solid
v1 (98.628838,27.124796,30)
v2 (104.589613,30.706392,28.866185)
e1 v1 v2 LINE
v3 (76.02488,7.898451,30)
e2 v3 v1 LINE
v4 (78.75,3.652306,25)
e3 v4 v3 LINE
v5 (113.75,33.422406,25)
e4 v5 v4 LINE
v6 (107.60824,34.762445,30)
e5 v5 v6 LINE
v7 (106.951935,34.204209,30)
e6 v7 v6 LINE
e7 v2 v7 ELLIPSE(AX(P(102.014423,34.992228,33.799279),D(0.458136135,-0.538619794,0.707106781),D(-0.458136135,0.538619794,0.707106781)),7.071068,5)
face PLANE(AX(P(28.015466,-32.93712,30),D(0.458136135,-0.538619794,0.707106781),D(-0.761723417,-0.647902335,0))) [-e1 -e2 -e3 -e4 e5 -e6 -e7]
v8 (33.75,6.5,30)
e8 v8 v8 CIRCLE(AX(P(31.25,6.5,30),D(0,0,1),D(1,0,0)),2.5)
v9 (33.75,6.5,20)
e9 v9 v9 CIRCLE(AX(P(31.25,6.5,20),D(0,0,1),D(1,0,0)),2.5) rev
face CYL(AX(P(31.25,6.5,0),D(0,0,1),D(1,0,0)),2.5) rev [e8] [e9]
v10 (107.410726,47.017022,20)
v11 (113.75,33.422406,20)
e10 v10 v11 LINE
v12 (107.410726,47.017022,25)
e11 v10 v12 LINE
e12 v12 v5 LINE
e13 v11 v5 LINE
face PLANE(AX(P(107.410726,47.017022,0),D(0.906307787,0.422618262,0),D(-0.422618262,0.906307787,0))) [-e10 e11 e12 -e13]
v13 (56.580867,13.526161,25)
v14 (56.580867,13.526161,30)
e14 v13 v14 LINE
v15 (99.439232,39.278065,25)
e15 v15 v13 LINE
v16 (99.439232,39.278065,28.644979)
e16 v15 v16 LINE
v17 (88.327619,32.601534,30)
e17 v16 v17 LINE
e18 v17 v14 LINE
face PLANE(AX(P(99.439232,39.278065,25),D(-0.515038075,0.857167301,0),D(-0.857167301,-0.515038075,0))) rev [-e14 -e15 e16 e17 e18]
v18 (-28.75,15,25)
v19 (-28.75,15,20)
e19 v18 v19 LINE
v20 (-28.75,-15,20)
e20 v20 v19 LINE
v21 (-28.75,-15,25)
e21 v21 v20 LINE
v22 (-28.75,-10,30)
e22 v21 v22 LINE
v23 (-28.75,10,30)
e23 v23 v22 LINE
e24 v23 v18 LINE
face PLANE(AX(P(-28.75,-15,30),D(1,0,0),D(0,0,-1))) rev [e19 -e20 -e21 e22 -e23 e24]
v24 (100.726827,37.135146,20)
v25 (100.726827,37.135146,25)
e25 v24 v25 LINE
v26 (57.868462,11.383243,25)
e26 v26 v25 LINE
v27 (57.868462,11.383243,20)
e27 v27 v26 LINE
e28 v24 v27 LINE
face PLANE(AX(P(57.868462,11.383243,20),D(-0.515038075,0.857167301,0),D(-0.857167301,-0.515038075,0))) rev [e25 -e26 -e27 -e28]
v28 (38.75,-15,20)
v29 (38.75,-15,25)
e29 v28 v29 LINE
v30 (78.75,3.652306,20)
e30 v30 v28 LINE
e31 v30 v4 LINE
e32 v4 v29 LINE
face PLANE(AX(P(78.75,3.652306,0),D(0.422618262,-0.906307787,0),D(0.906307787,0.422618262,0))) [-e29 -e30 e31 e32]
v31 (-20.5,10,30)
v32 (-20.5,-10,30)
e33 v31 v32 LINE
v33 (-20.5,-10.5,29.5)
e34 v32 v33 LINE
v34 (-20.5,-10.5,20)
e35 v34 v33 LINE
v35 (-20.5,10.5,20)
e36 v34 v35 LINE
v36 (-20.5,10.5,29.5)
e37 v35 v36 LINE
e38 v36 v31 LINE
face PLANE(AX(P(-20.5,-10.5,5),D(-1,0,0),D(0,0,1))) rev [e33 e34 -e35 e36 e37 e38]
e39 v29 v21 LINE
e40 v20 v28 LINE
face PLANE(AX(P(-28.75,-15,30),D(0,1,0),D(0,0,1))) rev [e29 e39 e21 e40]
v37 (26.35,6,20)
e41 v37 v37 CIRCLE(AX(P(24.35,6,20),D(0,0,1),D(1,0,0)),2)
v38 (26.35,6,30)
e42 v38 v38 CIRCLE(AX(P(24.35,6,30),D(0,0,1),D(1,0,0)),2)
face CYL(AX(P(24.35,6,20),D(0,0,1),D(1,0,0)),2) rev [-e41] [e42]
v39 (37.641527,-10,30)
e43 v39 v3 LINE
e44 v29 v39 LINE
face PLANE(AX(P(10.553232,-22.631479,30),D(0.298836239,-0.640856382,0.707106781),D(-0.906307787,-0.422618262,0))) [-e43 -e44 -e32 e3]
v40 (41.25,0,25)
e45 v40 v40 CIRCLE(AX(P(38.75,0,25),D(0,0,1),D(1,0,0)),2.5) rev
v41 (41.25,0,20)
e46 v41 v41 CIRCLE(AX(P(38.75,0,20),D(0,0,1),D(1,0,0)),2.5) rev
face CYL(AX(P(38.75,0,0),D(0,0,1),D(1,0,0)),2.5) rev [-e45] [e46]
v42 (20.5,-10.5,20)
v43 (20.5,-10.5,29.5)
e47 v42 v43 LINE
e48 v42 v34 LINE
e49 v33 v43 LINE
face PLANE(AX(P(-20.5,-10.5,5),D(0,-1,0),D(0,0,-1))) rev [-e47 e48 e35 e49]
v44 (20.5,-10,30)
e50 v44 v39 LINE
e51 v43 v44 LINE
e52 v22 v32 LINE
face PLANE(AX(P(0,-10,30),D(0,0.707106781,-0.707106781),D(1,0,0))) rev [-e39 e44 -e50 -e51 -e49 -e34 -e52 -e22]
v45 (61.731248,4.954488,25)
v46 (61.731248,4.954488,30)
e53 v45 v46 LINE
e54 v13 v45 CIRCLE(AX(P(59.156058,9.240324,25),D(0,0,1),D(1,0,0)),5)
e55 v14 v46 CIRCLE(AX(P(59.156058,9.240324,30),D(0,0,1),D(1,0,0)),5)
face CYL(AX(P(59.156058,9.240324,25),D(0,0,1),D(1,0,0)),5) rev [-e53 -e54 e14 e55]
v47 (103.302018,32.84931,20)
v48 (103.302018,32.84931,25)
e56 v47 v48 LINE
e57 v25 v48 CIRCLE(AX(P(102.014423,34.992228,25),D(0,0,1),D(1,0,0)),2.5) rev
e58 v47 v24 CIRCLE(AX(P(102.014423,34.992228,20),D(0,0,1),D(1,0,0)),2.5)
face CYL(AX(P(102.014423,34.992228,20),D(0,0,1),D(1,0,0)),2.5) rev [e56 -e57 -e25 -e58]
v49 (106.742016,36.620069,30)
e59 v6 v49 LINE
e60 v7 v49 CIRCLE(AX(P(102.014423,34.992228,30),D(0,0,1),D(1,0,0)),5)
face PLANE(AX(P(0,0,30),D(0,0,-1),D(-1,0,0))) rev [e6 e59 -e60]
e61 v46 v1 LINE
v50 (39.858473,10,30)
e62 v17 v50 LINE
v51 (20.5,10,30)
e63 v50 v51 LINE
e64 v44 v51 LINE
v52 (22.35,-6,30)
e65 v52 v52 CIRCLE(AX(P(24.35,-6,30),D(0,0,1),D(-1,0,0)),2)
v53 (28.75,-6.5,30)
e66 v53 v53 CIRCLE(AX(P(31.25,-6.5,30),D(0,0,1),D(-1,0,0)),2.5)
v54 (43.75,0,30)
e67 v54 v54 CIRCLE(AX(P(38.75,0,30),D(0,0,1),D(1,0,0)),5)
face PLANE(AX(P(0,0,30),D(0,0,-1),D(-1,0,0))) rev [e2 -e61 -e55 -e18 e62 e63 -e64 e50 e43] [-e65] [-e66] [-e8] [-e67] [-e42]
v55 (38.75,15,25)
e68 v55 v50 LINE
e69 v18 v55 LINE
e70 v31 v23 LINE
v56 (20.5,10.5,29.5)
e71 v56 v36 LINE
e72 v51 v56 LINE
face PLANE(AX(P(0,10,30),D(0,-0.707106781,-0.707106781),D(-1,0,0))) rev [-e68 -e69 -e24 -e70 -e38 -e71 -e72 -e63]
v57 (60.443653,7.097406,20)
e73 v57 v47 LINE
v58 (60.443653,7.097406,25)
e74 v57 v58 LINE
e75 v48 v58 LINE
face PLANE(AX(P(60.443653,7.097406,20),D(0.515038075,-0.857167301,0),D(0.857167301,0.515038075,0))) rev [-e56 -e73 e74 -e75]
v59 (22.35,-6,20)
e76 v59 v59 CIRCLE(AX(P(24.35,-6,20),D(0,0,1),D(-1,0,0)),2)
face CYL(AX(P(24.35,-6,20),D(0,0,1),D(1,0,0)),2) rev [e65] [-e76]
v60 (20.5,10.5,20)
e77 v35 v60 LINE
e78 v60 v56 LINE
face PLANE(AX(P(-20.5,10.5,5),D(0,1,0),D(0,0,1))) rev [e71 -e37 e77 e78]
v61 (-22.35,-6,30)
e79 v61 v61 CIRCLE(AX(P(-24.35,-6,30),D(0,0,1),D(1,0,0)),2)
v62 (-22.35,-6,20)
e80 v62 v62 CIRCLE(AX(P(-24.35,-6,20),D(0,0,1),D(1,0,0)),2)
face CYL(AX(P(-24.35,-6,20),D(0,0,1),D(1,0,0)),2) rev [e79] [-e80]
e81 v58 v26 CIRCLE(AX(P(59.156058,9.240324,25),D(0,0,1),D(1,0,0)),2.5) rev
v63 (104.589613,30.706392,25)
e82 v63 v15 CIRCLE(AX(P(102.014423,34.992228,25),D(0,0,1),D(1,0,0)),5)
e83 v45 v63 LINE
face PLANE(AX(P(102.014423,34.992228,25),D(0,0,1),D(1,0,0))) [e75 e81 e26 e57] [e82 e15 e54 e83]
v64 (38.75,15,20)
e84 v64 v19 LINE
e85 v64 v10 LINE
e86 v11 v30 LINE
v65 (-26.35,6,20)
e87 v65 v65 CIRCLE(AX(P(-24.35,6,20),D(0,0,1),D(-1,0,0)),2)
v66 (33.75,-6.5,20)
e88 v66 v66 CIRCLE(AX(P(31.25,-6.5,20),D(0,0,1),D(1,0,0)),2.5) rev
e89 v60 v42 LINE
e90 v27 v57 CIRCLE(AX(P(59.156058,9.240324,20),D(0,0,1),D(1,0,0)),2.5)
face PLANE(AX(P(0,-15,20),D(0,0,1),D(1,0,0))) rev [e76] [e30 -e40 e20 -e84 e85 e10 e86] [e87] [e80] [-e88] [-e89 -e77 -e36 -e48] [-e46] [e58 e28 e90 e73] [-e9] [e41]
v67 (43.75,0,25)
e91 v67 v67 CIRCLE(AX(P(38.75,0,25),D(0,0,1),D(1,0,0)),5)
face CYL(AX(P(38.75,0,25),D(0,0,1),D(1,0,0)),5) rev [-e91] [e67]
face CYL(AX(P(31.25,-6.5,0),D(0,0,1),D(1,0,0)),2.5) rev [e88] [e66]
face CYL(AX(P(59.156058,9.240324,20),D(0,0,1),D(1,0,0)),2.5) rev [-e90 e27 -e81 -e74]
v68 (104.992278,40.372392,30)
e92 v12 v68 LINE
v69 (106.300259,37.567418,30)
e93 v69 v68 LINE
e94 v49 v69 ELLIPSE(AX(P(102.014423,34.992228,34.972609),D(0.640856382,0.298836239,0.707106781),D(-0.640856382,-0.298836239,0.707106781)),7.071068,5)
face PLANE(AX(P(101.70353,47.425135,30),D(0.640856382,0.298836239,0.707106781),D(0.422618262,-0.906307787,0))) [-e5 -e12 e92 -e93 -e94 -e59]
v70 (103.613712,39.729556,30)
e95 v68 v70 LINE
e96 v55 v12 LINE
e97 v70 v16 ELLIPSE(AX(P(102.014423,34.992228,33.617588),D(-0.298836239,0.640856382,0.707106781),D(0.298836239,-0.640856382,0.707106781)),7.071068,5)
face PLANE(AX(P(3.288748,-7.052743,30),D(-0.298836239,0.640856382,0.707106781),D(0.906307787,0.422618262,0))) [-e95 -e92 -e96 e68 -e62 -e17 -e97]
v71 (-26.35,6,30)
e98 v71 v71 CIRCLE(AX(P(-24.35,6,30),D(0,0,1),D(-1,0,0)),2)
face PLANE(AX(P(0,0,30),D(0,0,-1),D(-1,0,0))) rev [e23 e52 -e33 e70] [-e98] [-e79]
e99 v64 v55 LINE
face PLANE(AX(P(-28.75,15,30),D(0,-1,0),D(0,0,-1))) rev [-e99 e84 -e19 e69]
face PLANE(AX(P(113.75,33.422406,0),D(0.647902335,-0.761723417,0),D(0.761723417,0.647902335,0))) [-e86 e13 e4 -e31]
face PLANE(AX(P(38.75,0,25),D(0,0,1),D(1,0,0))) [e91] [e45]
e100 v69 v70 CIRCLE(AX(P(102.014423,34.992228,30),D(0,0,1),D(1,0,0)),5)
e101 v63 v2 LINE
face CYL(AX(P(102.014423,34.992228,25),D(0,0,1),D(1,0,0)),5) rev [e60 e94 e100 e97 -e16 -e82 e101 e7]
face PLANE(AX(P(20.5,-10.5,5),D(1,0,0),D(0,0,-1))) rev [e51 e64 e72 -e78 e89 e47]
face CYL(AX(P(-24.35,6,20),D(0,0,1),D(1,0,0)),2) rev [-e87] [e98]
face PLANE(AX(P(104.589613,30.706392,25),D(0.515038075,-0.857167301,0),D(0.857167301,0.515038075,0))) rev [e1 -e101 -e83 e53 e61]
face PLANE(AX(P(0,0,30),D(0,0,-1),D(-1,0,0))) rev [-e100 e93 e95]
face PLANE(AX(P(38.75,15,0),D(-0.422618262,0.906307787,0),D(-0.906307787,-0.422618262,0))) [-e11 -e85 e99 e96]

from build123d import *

# Parameters (mm, degrees)
SKETCH1_W                = 57.5
SKETCH1_H                = 30
BOSS_EXTRUDE1_DEPTH      = 30
SKETCH2_W                = 41
SKETCH2_H                = 21
CUT_EXTRUDE1_DEPTH       = 25
SKETCH8_R                = 2
CUT_EXTRUDE6_DEPTH       = 10
SKETCH10_R               = 5
CUT_EXTRUDE8_DEPTH       = 10
BOSS_EXTRUDE4_DEPTH      = 30
SKETCH16_R               = 5
CUT_EXTRUDE10_DEPTH      = 30
CHAMFER5_SIZE            = 5
SKETCH19_R               = 2.5
CUT_EXTRUDE12_DEPTH      = 30
SKETCH20_R               = 7.5
CUT_EXTRUDE13_DEPTH      = 2.5
CUT_EXTRUDE15_DEPTH      = 122.918629513
CUT_EXTRUDE15_DEPTH_BACK = 122.918629513
SKETCH29_W               = 67.5
SKETCH29_H               = 15
CUT_EXTRUDE16_DEPTH      = 124.489525441
CUT_EXTRUDE17_DEPTH      = 5
SKETCH32_R               = 5
CUT_EXTRUDE18_DEPTH      = 5


with BuildPart() as part:
    # Sketch1 → Boss-Extrude1 (new body)
    with BuildSketch(Plane.XY):
        Rectangle(SKETCH1_W, SKETCH1_H)
    extrude(amount=BOSS_EXTRUDE1_DEPTH)

    # Sketch2 → Cut-Extrude1 (cut)
    with BuildSketch(Plane.XY.offset(30)):
        Rectangle(SKETCH2_W, SKETCH2_H)
    extrude(amount=-CUT_EXTRUDE1_DEPTH, mode=Mode.SUBTRACT)

    # Sketch8 → Cut-Extrude6 (cut)
    with BuildSketch(Plane.XY.offset(30)):
        with Locations((24.35, 6)):
            Circle(SKETCH8_R)
        with Locations(Location((24.35, -6, 0), (0, 0, 180))):
            Circle(SKETCH8_R)
        with Locations((-24.35, -6)):
            Circle(SKETCH8_R)
        with Locations(Location((-24.35, 6, 0), (0, 0, 180))):
            Circle(SKETCH8_R)
    extrude(amount=-CUT_EXTRUDE6_DEPTH, mode=Mode.SUBTRACT)

    # Sketch10 → Cut-Extrude8 (cut)
    with BuildSketch(Plane.XY.offset(5)):
        with Locations((-10, 0)):
            Circle(SKETCH10_R)
    extrude(amount=-CUT_EXTRUDE8_DEPTH, mode=Mode.SUBTRACT)

    # Sketch13 → Boss-Extrude4 (add)
    with BuildSketch(Plane.XY.offset(30)):
        Polygon((28.75, 15), (38.75, 15), (107.410726074, 47.017022383), (113.75, 33.422405577), (78.75, 3.652306326), (38.75, -15), (28.75, -15), align=None)
    extrude(amount=-BOSS_EXTRUDE4_DEPTH)

    # Sketch16 → Cut-Extrude10 (cut)
    with BuildSketch(Plane(origin=(1.175656739, -2.521204013, 0), x_dir=(0.9063077870366488, 0.42261826174070183, 0), z_dir=(-0.42261826174070183, 0.9063077870366488, 0))):
        with Locations(Location((97.217429724, -15, 0), (0, 0, 180))):
            Circle(SKETCH16_R)
        with BuildLine():
            Line((67.217429724, -12.5), (82.217429724, -12.5))
            ThreePointArc((82.217429724, -12.5), (84.717429724, -15), (82.217429724, -17.5))
            Line((82.217429724, -17.5), (67.217429724, -17.5))
            ThreePointArc((67.217429724, -17.5), (64.717429724, -15), (67.217429724, -12.5))
        make_face()
    extrude(amount=-CUT_EXTRUDE10_DEPTH, mode=Mode.SUBTRACT)

    # Chamfer5
    # the kernel refuses this chamfer: 5 mm, written as the material it takes off along each edge
    with BuildSketch(Plane(origin=(-28.75, 27.85841494, 0), x_dir=(-0.027495876610586317, 0, 0.9996219169112968), z_dir=(0, -1, 0))) as chamfer5_piece_1:
        Polygon((CHAMFER5_SIZE * 0.999621916911, -CHAMFER5_SIZE * 0.0274958766106), (-CHAMFER5_SIZE * 0.0274958766106, -CHAMFER5_SIZE * 0.999621916911), (0, 0), align=None)
    extrude(amount=55.71682988, mode=Mode.SUBTRACT)
    with BuildSketch(Plane(origin=(-41.60841494, -15, 0), x_dir=(0, -0.027495876610586317, 0.9996219169112968), z_dir=(1, 0, 0)), Plane(origin=(51.60841494, -15, 30), x_dir=(0, -0.027495876610586317, -0.9996219169112968), z_dir=(-1, 0, 0))) as chamfer5_piece_2:
        Polygon((CHAMFER5_SIZE * 0.999621916911, -CHAMFER5_SIZE * 0.0274958766106), (-CHAMFER5_SIZE * 0.0274958766106, -CHAMFER5_SIZE * 0.999621916911), (0, 0), align=None)
    extrude(amount=93.21682988, mode=Mode.SUBTRACT)
    with BuildSketch(Plane(origin=(90.403681589, 9.086507297, 0), x_dir=(0.011620259578202724, -0.024919727083573626, 0.9996219169112968), z_dir=(-0.9063077870366526, -0.4226182617406939, 0)), Plane(origin=(90.403681589, 9.086507297, 30), x_dir=(-0.4224584769229526, 0.905965127389214, 0.02749587661058631), z_dir=(-0.9063077870366526, -0.4226182617406939, 0))) as chamfer5_piece_3:
        Polygon((CHAMFER5_SIZE * 0.999621916911, CHAMFER5_SIZE * 0.0274958766106), (-CHAMFER5_SIZE * 0.0274958766106, CHAMFER5_SIZE * 0.999621916911), (0, 0), align=None)
    extrude(amount=69.851946638, mode=Mode.SUBTRACT)
    with BuildSketch(Plane(origin=(123.544555766, 41.753402643, 0), x_dir=(-0.6476573741944397, 0.7614354223576539, -0.027495876610586414), z_dir=(-0.7617234170999287, -0.6479023351104763, 0))) as chamfer5_piece_4:
        Polygon((CHAMFER5_SIZE * 0.999621916911, -CHAMFER5_SIZE * 0.0274958766106), (-CHAMFER5_SIZE * 0.0274958766106, -CHAMFER5_SIZE * 0.999621916911), (0, 0), align=None)
    extrude(amount=71.665266299, mode=Mode.SUBTRACT)
    with BuildSketch(Plane(origin=(101.976525103, 58.670703972, 0), x_dir=(-0.9059651273892108, -0.42245847692295924, -0.027495876610586344), z_dir=(0.42261826174070055, -0.9063077870366495, 0))) as chamfer5_piece_5:
        Polygon((CHAMFER5_SIZE * 0.999621916911, -CHAMFER5_SIZE * 0.0274958766106), (-CHAMFER5_SIZE * 0.0274958766106, -CHAMFER5_SIZE * 0.999621916911), (0, 0), align=None)
    extrude(amount=40.71682988, mode=Mode.SUBTRACT)
    with BuildSketch(Plane(origin=(27.096318411, 9.565799029, 0), x_dir=(0.4224584769229604, -0.9059651273892103, -0.02749587661058636), z_dir=(0.9063077870366489, 0.4226182617407018, 0))) as chamfer5_piece_6_section:
        Polygon((CHAMFER5_SIZE * 0.999621916911, -CHAMFER5_SIZE * 0.0274958766106), (-CHAMFER5_SIZE * 0.0274958766106, -CHAMFER5_SIZE * 0.999621916911), (0, 0), align=None)
    chamfer5_piece_6 = extrude(amount=101.47555893, mode=Mode.PRIVATE)
    chamfer5_piece_6 = split(chamfer5_piece_6, bisect_by=Plane(origin=(81.150743587, 15, 1.670360501), z_dir=(0, 1, 0)), keep=Keep.TOP, mode=Mode.PRIVATE)
    add(chamfer5_piece_6, mode=Mode.SUBTRACT)
    with BuildSketch(Plane(origin=(-41.60841494, 15, 0), x_dir=(0, -0.9996219169112968, -0.027495876610586372), z_dir=(1, 0, 0))) as chamfer5_piece_7_section:
        Polygon((CHAMFER5_SIZE * 0.999621916911, -CHAMFER5_SIZE * 0.0274958766106), (-CHAMFER5_SIZE * 0.0274958766106, -CHAMFER5_SIZE * 0.999621916911), (0, 0), align=None)
    chamfer5_piece_7 = extrude(amount=93.21682988, mode=Mode.PRIVATE)
    chamfer5_piece_7 = split(chamfer5_piece_7, bisect_by=Plane(origin=(3.719146846, -1.335155097, 1.672660276), z_dir=(-0.4226182617407018, 0.9063077870366489, 0)), keep=Keep.TOP, mode=Mode.PRIVATE)
    add(chamfer5_piece_7, mode=Mode.SUBTRACT)
    with BuildSketch(Plane(origin=(51.60841494, 15, 30), x_dir=(0, -0.9996219169112968, 0.027495876610586317), z_dir=(-1, 0, 0))) as chamfer5_piece_8_section:
        Polygon((CHAMFER5_SIZE * 0.999621916911, -CHAMFER5_SIZE * 0.0274958766106), (-CHAMFER5_SIZE * 0.0274958766106, -CHAMFER5_SIZE * 0.999621916911), (0, 0), align=None)
    chamfer5_piece_8 = extrude(amount=93.21682988, mode=Mode.PRIVATE)
    chamfer5_piece_8 = split(chamfer5_piece_8, bisect_by=Plane(origin=(3.719146846, -1.335155097, 28.327339724), z_dir=(-0.4226182617407018, 0.9063077870366489, 0)), keep=Keep.TOP, mode=Mode.PRIVATE)
    add(chamfer5_piece_8, mode=Mode.SUBTRACT)
    with BuildSketch(Plane(origin=(123.544555766, 41.753402643, 30), x_dir=(-0.6476573741944397, 0.7614354223576539, 0.02749587661058634), z_dir=(-0.7617234170999287, -0.6479023351104763, 0))) as chamfer5_piece_9:
        Polygon((CHAMFER5_SIZE * 0.999621916911, CHAMFER5_SIZE * 0.0274958766106), (-CHAMFER5_SIZE * 0.0274958766106, CHAMFER5_SIZE * 0.999621916911), (0, 0), align=None)
    extrude(amount=71.665266299, mode=Mode.SUBTRACT)
    with BuildSketch(Plane(origin=(27.096318411, 9.565799029, 30), x_dir=(0.4224584769229604, -0.9059651273892103, 0.027495876610586313), z_dir=(0.9063077870366489, 0.4226182617407018, 0))) as chamfer5_piece_10_section:
        Polygon((CHAMFER5_SIZE * 0.999621916911, CHAMFER5_SIZE * 0.0274958766106), (-CHAMFER5_SIZE * 0.0274958766106, CHAMFER5_SIZE * 0.999621916911), (0, 0), align=None)
    chamfer5_piece_10 = extrude(amount=101.47555893, mode=Mode.PRIVATE)
    chamfer5_piece_10 = split(chamfer5_piece_10, bisect_by=Plane(origin=(81.150743587, 15, 28.329639499), z_dir=(0, 1, 0)), keep=Keep.TOP, mode=Mode.PRIVATE)
    add(chamfer5_piece_10, mode=Mode.SUBTRACT)
    with BuildSketch(Plane(origin=(101.976525103, 58.670703972, 30), x_dir=(-0.9059651273892108, -0.42245847692295924, 0.027495876610586337), z_dir=(0.42261826174070055, -0.9063077870366495, 0))) as chamfer5_piece_11:
        Polygon((CHAMFER5_SIZE * 0.999621916911, CHAMFER5_SIZE * 0.0274958766106), (-CHAMFER5_SIZE * 0.0274958766106, CHAMFER5_SIZE * 0.999621916911), (0, 0), align=None)
    extrude(amount=40.71682988, mode=Mode.SUBTRACT)
    with BuildSketch(Plane(origin=(27.096318411, 9.565799029, 0), x_dir=(0.4224584769229604, -0.9059651273892103, -0.02749587661058636), z_dir=(0.9063077870366489, 0.4226182617407018, 0))) as chamfer5_piece_12a_section:
        Polygon((CHAMFER5_SIZE * 0.999621916911, -CHAMFER5_SIZE * 0.0274958766106), (-CHAMFER5_SIZE * 0.0274958766106, -CHAMFER5_SIZE * 0.999621916911), (0, 0), align=None)
    chamfer5_piece_12a = extrude(amount=101.47555893, mode=Mode.PRIVATE)
    chamfer5_piece_12a = split(chamfer5_piece_12a, bisect_by=Plane(origin=(35.512062488, 15, 1.537951212), z_dir=(0, -1, 0)), keep=Keep.TOP, mode=Mode.PRIVATE)
    with BuildSketch(Plane(origin=(-41.60841494, 15, 0), x_dir=(0, -0.9996219169112968, -0.027495876610586372), z_dir=(1, 0, 0))) as chamfer5_piece_12b_section:
        Polygon((CHAMFER5_SIZE * 0.999621916911, -CHAMFER5_SIZE * 0.0274958766106), (-CHAMFER5_SIZE * 0.0274958766106, -CHAMFER5_SIZE * 0.999621916911), (0, 0), align=None)
    chamfer5_piece_12b = extrude(amount=93.21682988, mode=Mode.PRIVATE)
    chamfer5_piece_12b = split(chamfer5_piece_12b, bisect_by=Plane(origin=(41.684567981, 16.368411523, 1.537951212), z_dir=(0.4226182617407018, -0.9063077870366489, 0)), keep=Keep.TOP, mode=Mode.PRIVATE)
    chamfer5_piece_12 = chamfer5_piece_12a & chamfer5_piece_12b
    add(chamfer5_piece_12, mode=Mode.SUBTRACT)
    with BuildSketch(Plane(origin=(27.096318411, 9.565799029, 30), x_dir=(0.4224584769229604, -0.9059651273892103, 0.027495876610586313), z_dir=(0.9063077870366489, 0.4226182617407018, 0))) as chamfer5_piece_13a_section:
        Polygon((CHAMFER5_SIZE * 0.999621916911, CHAMFER5_SIZE * 0.0274958766106), (-CHAMFER5_SIZE * 0.0274958766106, CHAMFER5_SIZE * 0.999621916911), (0, 0), align=None)
    chamfer5_piece_13a = extrude(amount=101.47555893, mode=Mode.PRIVATE)
    chamfer5_piece_13a = split(chamfer5_piece_13a, bisect_by=Plane(origin=(35.512062488, 15, 28.462048788), z_dir=(0, -1, 0)), keep=Keep.TOP, mode=Mode.PRIVATE)
    with BuildSketch(Plane(origin=(51.60841494, 15, 30), x_dir=(0, -0.9996219169112968, 0.027495876610586317), z_dir=(-1, 0, 0))) as chamfer5_piece_13b_section:
        Polygon((CHAMFER5_SIZE * 0.999621916911, -CHAMFER5_SIZE * 0.0274958766106), (-CHAMFER5_SIZE * 0.0274958766106, -CHAMFER5_SIZE * 0.999621916911), (0, 0), align=None)
    chamfer5_piece_13b = extrude(amount=93.21682988, mode=Mode.PRIVATE)
    chamfer5_piece_13b = split(chamfer5_piece_13b, bisect_by=Plane(origin=(41.684567981, 16.368411523, 28.462048788), z_dir=(0.4226182617407018, -0.9063077870366489, 0)), keep=Keep.TOP, mode=Mode.PRIVATE)
    chamfer5_piece_13 = chamfer5_piece_13a & chamfer5_piece_13b
    add(chamfer5_piece_13, mode=Mode.SUBTRACT)

    # Sketch19 → Cut-Extrude12 (cut)
    with BuildSketch(Plane.XY.offset(30)):
        with Locations((38.75, 0)):
            Circle(SKETCH19_R)
        with Locations((31.25, 6.5)):
            Circle(SKETCH19_R)
        with Locations(Location((31.25, -6.5, 0), (0, 0, 180))):
            Circle(SKETCH19_R)
    extrude(amount=-CUT_EXTRUDE12_DEPTH, mode=Mode.SUBTRACT)

    # Sketch20 → Cut-Extrude13 (cut)
    with BuildSketch(Plane.XY.offset(5)):
        with Locations((-10, 0)):
            Circle(SKETCH20_R)
    extrude(amount=-CUT_EXTRUDE13_DEPTH, mode=Mode.SUBTRACT)

    # Sketch29 → Cut-Extrude15 (cut, two sides: drawn at the far end of the back side and taken through both)
    with BuildSketch(Plane(origin=(0, 15, 0), x_dir=(1, 0, 0), z_dir=(0, 1, 0)).offset(-CUT_EXTRUDE15_DEPTH_BACK)):
        with Locations((5, -12.5)):
            Rectangle(SKETCH29_W, SKETCH29_H)
        Polygon((38.75, -20), (113.75, -20), (113.75, 0), (-28.75, 0), (-28.75, -5), (38.75, -5), align=None)
    extrude(amount=CUT_EXTRUDE15_DEPTH + CUT_EXTRUDE15_DEPTH_BACK, mode=Mode.SUBTRACT)

    # Sketch30 → Cut-Extrude16 (cut, through all)
    with BuildSketch(Plane.XY.offset(30)):
        with BuildLine():
            Line((57.868462424, 11.383242603), (100.726827459, 37.135146348))
            ThreePointArc((100.726827459, 37.135146348), (104.157340898, 36.279823284), (103.302017833, 32.849309845))
            Line((103.302017833, 32.849309845), (60.443652798, 7.097406099))
            ThreePointArc((60.443652798, 7.097406099), (57.013139359, 7.952729164), (57.868462424, 11.383242603))
        make_face()
    extrude(amount=-CUT_EXTRUDE16_DEPTH, mode=Mode.SUBTRACT)

    # Sketch31 → Cut-Extrude17 (cut)
    with BuildSketch(Plane.XY.offset(30)):
        with BuildLine():
            Line((104.589613021, 30.706391593), (61.731247986, 4.954487847))
            ThreePointArc((61.731247986, 4.954487847), (54.870221108, 6.665133976), (56.580867236, 13.526160855))
            Line((56.580867236, 13.526160855), (99.439232272, 39.2780646))
            ThreePointArc((99.439232272, 39.2780646), (106.30025915, 37.567418471), (104.589613021, 30.706391593))
        make_face()
    extrude(amount=-CUT_EXTRUDE17_DEPTH, mode=Mode.SUBTRACT)

    # Sketch32 → Cut-Extrude18 (cut)
    with BuildSketch(Plane.XY.offset(30)):
        with Locations((38.75, 0)):
            Circle(SKETCH32_R)
    extrude(amount=-CUT_EXTRUDE18_DEPTH, mode=Mode.SUBTRACT)


solid = part.part
